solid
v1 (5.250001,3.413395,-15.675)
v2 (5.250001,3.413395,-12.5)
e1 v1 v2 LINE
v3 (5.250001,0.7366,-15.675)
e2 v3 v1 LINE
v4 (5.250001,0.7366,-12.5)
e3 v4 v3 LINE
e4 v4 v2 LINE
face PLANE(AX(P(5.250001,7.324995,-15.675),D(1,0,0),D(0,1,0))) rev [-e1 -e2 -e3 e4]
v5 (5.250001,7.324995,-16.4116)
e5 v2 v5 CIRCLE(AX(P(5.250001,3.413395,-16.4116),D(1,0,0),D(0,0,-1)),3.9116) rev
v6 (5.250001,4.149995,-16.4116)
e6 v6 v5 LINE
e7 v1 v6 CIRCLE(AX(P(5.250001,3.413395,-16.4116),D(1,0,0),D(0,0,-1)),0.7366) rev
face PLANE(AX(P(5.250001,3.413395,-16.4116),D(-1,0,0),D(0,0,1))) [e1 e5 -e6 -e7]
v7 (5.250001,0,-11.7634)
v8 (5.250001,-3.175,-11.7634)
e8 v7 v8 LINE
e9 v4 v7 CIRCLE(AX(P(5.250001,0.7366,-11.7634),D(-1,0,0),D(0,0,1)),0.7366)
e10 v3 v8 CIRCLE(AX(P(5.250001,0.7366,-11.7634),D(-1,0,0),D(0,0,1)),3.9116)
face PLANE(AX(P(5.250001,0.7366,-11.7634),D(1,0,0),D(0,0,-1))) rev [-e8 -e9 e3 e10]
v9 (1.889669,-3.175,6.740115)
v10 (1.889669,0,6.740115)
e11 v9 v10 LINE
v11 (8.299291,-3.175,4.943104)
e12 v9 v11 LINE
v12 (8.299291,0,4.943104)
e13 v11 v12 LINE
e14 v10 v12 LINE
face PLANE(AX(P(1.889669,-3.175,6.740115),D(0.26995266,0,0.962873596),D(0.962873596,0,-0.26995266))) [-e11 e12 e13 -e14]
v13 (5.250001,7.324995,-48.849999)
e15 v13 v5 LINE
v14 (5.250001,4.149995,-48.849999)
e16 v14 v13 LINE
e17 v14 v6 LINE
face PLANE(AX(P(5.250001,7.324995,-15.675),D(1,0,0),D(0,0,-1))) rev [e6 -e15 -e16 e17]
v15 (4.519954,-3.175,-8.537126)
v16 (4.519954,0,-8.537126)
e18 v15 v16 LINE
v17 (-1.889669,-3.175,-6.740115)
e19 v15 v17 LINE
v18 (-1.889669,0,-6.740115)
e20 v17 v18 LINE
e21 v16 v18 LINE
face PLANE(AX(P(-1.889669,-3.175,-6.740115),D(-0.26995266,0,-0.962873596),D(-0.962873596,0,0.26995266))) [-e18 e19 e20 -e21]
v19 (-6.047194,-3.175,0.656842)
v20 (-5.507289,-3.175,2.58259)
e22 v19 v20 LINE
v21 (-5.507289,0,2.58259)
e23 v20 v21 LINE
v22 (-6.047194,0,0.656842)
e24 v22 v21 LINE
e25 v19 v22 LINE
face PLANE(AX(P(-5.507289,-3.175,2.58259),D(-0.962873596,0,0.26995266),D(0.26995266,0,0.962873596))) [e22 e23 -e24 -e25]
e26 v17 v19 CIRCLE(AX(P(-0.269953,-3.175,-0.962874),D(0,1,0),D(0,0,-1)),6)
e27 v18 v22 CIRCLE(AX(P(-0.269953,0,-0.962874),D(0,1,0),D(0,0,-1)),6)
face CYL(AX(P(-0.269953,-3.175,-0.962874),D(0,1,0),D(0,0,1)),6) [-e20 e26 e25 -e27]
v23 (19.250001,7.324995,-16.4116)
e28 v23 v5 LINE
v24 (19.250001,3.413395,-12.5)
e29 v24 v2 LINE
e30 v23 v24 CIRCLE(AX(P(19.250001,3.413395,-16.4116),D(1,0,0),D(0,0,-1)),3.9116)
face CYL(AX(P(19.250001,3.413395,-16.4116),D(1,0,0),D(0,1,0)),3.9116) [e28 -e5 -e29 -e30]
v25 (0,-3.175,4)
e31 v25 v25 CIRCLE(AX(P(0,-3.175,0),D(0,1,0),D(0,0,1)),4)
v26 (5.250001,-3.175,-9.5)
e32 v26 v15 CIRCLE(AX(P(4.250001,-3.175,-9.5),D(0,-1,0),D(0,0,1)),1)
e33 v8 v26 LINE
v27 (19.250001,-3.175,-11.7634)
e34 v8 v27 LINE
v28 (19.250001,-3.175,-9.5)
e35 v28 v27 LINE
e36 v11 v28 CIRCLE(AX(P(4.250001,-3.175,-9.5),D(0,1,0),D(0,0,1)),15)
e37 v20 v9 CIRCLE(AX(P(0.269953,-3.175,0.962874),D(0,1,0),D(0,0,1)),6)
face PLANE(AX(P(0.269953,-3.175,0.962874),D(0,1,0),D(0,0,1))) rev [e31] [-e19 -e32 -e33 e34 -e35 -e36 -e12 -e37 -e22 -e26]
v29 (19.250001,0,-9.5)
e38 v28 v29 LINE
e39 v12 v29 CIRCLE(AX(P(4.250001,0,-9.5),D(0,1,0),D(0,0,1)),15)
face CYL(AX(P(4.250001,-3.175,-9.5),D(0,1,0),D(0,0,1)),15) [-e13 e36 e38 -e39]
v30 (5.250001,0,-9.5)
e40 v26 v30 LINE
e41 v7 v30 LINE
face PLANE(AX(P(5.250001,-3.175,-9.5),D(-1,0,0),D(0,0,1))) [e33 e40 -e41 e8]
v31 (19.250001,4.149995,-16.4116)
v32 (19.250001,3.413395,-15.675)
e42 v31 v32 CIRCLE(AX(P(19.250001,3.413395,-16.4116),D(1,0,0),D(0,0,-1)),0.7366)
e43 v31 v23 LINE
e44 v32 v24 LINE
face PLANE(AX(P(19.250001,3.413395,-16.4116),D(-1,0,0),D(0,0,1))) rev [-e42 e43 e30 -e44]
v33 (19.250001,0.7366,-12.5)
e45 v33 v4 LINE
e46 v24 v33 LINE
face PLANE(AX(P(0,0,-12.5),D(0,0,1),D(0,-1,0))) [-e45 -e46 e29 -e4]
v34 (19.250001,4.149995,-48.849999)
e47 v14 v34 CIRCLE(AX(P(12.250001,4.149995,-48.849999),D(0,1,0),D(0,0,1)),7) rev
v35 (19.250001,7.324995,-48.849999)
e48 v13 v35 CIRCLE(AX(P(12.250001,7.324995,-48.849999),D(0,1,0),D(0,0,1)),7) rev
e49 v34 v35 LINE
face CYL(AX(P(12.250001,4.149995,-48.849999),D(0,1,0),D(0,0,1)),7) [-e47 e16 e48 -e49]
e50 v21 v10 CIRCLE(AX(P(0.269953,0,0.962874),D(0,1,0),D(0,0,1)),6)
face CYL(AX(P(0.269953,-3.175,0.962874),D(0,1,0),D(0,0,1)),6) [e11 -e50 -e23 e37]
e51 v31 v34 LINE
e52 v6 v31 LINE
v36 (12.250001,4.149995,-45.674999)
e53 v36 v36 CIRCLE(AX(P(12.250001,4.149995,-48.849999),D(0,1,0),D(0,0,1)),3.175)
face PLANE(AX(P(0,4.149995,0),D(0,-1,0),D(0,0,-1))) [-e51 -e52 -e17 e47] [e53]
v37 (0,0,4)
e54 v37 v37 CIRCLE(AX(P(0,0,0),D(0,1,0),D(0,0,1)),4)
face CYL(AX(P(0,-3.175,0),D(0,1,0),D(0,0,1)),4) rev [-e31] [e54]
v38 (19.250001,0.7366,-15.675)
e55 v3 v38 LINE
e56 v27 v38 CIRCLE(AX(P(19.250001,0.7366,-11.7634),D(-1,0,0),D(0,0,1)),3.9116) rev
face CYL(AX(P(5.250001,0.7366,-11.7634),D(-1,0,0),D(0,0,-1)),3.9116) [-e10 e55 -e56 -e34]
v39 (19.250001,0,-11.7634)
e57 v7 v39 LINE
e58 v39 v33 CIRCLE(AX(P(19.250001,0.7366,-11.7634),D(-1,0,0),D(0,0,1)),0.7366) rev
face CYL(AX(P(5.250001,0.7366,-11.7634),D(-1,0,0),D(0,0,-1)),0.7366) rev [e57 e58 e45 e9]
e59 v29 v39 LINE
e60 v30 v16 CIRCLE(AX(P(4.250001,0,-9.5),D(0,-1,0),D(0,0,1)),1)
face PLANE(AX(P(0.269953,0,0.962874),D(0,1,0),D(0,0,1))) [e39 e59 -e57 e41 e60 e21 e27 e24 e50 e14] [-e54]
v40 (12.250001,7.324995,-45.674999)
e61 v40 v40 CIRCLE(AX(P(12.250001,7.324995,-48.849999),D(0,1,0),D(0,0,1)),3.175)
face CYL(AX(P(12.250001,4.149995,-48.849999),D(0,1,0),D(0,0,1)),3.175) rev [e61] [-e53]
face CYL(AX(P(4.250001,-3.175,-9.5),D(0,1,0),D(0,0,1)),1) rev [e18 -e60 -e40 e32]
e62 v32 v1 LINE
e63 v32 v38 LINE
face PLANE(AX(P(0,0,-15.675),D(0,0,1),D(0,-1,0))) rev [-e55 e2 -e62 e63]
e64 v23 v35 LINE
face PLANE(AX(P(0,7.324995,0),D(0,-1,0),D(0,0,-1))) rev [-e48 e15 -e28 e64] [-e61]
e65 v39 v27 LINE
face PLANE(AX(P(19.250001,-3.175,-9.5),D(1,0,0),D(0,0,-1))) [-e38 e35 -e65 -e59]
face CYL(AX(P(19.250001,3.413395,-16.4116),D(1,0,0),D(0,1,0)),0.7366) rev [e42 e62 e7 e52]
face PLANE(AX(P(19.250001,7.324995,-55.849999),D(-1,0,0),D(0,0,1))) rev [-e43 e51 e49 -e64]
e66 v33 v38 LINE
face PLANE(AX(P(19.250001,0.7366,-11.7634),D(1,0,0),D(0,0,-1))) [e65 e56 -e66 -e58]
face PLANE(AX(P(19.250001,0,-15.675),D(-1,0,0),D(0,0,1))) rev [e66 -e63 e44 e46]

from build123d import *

# Parameters (mm, degrees)
SKETCH1_R                    = 4
BASE_FLANGE1_DEPTH           = 3.175
EDGE_FLANGE1_STRIP_W         = 14.1732
EDGE_FLANGE1_STRIP_H         = 3.175
EDGE_FLANGE1_STRIP_CUT_DEPTH = 14
EDGE_FLANGE1_DEPTH           = 14
EDGE_FLANGE2_STRIP_W         = 14.1732
EDGE_FLANGE2_STRIP_H         = 3.175
EDGE_FLANGE2_STRIP_CUT_DEPTH = 14
EDGE_FLANGE2_DEPTH           = 14
SKETCH17_R                   = 3.175
CUT_EXTRUDE1_DEPTH           = 3.175


# Sheet-metal steps are written as plain solids
with BuildPart() as part:
    # Sketch1 → Base-Flange1 (new body)
    with BuildSketch(Plane(origin=(0, 0, 0), x_dir=(1, 0, 0), z_dir=(0, 1, 0))):
        with BuildLine():
            Line((19.250001318, 12.5), (5.250001318, 12.5))
            Line((5.250001318, 12.5), (5.250001318, 9.5))
            ThreePointArc((5.250001318, 9.5), (5.046855339, 8.895828112), (4.519953978, 8.537126404))
            Line((4.519953978, 8.537126404), (-1.889668619, 6.740115171))
            ThreePointArc((-1.889668619, 6.740115171), (-5.500391492, 3.902688152), (-6.047194235, -0.656842363))
            Line((-6.047194235, -0.656842363), (-5.507288915, -2.582589555))
            ThreePointArc((-5.507288915, -2.582589555), (-2.669861896, -6.193312428), (1.889668619, -6.740115171))
            Line((1.889668619, -6.740115171), (8.299291215, -4.943103937))
            ThreePointArc((8.299291215, -4.943103937), (16.202811625, 0.437421682), (19.250001318, 9.5))
            Line((19.250001318, 9.5), (19.250001318, 12.5))
        make_face()
        with Locations(Location((0, 0, 0), (0, 0, 270))):
            Circle(SKETCH1_R, mode=Mode.SUBTRACT)
    extrude(amount=-BASE_FLANGE1_DEPTH)

    # Edge-Flange1 strip (across the edge) → Edge-Flange1 strip cut (cut)
    with BuildSketch(Plane(origin=(19.250001318, 0, -12.5), x_dir=(0, 0, 1), z_dir=(-1, 0, 0))):
        with Locations((-6.35, -1.5875)):
            Rectangle(EDGE_FLANGE1_STRIP_W, EDGE_FLANGE1_STRIP_H)
    extrude(amount=EDGE_FLANGE1_STRIP_CUT_DEPTH, mode=Mode.SUBTRACT)

    # Edge-Flange1 section (across the edge) → Edge-Flange1 (add)
    with BuildSketch(Plane(origin=(19.250001318, 0, -12.5), x_dir=(0, 0, 1), z_dir=(-1, 0, 0))):
        with BuildLine():
            Line((-3.175, 0.7366), (-3.175, 7.324994814))
            Line((-3.175, 7.324994814), (0, 7.324994814))
            Line((0, 7.324994814), (0, 0.7366))
            ThreePointArc((0, 0.7366), (0.215745145, 0.215745145), (0.7366, 0))
            Line((0.7366, 0), (0.7366, -3.175))
            ThreePointArc((0.7366, -3.175), (-2.029318885, -2.029318885), (-3.175, 0.7366))
        make_face()
    extrude(amount=EDGE_FLANGE1_DEPTH)

    # Edge-Flange2 strip (across the edge) → Edge-Flange2 strip cut (cut)
    with BuildSketch(Plane(origin=(5.250001318, 7.324994814, -15.675), x_dir=(0, -1, 0), z_dir=(1, 0, 0))):
        with Locations((-3.175, -1.5875)):
            Rectangle(EDGE_FLANGE2_STRIP_W, EDGE_FLANGE2_STRIP_H)
    extrude(amount=EDGE_FLANGE2_STRIP_CUT_DEPTH, mode=Mode.SUBTRACT)

    # Edge-Flange2 section (across the edge) → Edge-Flange2 (add)
    with BuildSketch(Plane(origin=(5.250001318, 7.324994814, -15.675), x_dir=(0, -1, 0), z_dir=(1, 0, 0))):
        with BuildLine():
            Line((0, 0.7366), (0, 40.174998631))
            Line((0, 40.174998631), (3.175, 40.174998631))
            Line((3.175, 40.174998631), (3.175, 0.7366))
            ThreePointArc((3.175, 0.7366), (3.390745145, 0.215745145), (3.9116, 0))
            Line((3.9116, 0), (3.9116, -3.175))
            ThreePointArc((3.9116, -3.175), (1.145681115, -2.029318885), (0, 0.7366))
        make_face()
    extrude(amount=EDGE_FLANGE2_DEPTH)

    # Sketch17 → Cut-Extrude1 (cut)
    with BuildSketch(Plane(origin=(0, 7.324994814, 0), x_dir=(1, 0, 0), z_dir=(0, 1, 0))):
        with BuildLine():
            ThreePointArc((5.250001318, 48.849998631), (7.30025385, 53.7997461), (12.250001318, 55.849998631))
            Line((12.250001318, 55.849998631), (5.250001318, 55.849998631))
            Line((5.250001318, 55.849998631), (5.250001318, 48.849998631))
        make_face()
        with BuildLine():
            ThreePointArc((12.250001318, 55.849998631), (17.199748787, 53.7997461), (19.250001318, 48.849998631))
            Line((19.250001318, 48.849998631), (19.250001318, 55.849998631))
            Line((19.250001318, 55.849998631), (12.250001318, 55.849998631))
        make_face()
        with Locations(Location((12.250001318, 48.849998631, 0), (0, 0, 270))):
            Circle(SKETCH17_R)
    extrude(amount=-CUT_EXTRUDE1_DEPTH, mode=Mode.SUBTRACT)


solid = part.part
